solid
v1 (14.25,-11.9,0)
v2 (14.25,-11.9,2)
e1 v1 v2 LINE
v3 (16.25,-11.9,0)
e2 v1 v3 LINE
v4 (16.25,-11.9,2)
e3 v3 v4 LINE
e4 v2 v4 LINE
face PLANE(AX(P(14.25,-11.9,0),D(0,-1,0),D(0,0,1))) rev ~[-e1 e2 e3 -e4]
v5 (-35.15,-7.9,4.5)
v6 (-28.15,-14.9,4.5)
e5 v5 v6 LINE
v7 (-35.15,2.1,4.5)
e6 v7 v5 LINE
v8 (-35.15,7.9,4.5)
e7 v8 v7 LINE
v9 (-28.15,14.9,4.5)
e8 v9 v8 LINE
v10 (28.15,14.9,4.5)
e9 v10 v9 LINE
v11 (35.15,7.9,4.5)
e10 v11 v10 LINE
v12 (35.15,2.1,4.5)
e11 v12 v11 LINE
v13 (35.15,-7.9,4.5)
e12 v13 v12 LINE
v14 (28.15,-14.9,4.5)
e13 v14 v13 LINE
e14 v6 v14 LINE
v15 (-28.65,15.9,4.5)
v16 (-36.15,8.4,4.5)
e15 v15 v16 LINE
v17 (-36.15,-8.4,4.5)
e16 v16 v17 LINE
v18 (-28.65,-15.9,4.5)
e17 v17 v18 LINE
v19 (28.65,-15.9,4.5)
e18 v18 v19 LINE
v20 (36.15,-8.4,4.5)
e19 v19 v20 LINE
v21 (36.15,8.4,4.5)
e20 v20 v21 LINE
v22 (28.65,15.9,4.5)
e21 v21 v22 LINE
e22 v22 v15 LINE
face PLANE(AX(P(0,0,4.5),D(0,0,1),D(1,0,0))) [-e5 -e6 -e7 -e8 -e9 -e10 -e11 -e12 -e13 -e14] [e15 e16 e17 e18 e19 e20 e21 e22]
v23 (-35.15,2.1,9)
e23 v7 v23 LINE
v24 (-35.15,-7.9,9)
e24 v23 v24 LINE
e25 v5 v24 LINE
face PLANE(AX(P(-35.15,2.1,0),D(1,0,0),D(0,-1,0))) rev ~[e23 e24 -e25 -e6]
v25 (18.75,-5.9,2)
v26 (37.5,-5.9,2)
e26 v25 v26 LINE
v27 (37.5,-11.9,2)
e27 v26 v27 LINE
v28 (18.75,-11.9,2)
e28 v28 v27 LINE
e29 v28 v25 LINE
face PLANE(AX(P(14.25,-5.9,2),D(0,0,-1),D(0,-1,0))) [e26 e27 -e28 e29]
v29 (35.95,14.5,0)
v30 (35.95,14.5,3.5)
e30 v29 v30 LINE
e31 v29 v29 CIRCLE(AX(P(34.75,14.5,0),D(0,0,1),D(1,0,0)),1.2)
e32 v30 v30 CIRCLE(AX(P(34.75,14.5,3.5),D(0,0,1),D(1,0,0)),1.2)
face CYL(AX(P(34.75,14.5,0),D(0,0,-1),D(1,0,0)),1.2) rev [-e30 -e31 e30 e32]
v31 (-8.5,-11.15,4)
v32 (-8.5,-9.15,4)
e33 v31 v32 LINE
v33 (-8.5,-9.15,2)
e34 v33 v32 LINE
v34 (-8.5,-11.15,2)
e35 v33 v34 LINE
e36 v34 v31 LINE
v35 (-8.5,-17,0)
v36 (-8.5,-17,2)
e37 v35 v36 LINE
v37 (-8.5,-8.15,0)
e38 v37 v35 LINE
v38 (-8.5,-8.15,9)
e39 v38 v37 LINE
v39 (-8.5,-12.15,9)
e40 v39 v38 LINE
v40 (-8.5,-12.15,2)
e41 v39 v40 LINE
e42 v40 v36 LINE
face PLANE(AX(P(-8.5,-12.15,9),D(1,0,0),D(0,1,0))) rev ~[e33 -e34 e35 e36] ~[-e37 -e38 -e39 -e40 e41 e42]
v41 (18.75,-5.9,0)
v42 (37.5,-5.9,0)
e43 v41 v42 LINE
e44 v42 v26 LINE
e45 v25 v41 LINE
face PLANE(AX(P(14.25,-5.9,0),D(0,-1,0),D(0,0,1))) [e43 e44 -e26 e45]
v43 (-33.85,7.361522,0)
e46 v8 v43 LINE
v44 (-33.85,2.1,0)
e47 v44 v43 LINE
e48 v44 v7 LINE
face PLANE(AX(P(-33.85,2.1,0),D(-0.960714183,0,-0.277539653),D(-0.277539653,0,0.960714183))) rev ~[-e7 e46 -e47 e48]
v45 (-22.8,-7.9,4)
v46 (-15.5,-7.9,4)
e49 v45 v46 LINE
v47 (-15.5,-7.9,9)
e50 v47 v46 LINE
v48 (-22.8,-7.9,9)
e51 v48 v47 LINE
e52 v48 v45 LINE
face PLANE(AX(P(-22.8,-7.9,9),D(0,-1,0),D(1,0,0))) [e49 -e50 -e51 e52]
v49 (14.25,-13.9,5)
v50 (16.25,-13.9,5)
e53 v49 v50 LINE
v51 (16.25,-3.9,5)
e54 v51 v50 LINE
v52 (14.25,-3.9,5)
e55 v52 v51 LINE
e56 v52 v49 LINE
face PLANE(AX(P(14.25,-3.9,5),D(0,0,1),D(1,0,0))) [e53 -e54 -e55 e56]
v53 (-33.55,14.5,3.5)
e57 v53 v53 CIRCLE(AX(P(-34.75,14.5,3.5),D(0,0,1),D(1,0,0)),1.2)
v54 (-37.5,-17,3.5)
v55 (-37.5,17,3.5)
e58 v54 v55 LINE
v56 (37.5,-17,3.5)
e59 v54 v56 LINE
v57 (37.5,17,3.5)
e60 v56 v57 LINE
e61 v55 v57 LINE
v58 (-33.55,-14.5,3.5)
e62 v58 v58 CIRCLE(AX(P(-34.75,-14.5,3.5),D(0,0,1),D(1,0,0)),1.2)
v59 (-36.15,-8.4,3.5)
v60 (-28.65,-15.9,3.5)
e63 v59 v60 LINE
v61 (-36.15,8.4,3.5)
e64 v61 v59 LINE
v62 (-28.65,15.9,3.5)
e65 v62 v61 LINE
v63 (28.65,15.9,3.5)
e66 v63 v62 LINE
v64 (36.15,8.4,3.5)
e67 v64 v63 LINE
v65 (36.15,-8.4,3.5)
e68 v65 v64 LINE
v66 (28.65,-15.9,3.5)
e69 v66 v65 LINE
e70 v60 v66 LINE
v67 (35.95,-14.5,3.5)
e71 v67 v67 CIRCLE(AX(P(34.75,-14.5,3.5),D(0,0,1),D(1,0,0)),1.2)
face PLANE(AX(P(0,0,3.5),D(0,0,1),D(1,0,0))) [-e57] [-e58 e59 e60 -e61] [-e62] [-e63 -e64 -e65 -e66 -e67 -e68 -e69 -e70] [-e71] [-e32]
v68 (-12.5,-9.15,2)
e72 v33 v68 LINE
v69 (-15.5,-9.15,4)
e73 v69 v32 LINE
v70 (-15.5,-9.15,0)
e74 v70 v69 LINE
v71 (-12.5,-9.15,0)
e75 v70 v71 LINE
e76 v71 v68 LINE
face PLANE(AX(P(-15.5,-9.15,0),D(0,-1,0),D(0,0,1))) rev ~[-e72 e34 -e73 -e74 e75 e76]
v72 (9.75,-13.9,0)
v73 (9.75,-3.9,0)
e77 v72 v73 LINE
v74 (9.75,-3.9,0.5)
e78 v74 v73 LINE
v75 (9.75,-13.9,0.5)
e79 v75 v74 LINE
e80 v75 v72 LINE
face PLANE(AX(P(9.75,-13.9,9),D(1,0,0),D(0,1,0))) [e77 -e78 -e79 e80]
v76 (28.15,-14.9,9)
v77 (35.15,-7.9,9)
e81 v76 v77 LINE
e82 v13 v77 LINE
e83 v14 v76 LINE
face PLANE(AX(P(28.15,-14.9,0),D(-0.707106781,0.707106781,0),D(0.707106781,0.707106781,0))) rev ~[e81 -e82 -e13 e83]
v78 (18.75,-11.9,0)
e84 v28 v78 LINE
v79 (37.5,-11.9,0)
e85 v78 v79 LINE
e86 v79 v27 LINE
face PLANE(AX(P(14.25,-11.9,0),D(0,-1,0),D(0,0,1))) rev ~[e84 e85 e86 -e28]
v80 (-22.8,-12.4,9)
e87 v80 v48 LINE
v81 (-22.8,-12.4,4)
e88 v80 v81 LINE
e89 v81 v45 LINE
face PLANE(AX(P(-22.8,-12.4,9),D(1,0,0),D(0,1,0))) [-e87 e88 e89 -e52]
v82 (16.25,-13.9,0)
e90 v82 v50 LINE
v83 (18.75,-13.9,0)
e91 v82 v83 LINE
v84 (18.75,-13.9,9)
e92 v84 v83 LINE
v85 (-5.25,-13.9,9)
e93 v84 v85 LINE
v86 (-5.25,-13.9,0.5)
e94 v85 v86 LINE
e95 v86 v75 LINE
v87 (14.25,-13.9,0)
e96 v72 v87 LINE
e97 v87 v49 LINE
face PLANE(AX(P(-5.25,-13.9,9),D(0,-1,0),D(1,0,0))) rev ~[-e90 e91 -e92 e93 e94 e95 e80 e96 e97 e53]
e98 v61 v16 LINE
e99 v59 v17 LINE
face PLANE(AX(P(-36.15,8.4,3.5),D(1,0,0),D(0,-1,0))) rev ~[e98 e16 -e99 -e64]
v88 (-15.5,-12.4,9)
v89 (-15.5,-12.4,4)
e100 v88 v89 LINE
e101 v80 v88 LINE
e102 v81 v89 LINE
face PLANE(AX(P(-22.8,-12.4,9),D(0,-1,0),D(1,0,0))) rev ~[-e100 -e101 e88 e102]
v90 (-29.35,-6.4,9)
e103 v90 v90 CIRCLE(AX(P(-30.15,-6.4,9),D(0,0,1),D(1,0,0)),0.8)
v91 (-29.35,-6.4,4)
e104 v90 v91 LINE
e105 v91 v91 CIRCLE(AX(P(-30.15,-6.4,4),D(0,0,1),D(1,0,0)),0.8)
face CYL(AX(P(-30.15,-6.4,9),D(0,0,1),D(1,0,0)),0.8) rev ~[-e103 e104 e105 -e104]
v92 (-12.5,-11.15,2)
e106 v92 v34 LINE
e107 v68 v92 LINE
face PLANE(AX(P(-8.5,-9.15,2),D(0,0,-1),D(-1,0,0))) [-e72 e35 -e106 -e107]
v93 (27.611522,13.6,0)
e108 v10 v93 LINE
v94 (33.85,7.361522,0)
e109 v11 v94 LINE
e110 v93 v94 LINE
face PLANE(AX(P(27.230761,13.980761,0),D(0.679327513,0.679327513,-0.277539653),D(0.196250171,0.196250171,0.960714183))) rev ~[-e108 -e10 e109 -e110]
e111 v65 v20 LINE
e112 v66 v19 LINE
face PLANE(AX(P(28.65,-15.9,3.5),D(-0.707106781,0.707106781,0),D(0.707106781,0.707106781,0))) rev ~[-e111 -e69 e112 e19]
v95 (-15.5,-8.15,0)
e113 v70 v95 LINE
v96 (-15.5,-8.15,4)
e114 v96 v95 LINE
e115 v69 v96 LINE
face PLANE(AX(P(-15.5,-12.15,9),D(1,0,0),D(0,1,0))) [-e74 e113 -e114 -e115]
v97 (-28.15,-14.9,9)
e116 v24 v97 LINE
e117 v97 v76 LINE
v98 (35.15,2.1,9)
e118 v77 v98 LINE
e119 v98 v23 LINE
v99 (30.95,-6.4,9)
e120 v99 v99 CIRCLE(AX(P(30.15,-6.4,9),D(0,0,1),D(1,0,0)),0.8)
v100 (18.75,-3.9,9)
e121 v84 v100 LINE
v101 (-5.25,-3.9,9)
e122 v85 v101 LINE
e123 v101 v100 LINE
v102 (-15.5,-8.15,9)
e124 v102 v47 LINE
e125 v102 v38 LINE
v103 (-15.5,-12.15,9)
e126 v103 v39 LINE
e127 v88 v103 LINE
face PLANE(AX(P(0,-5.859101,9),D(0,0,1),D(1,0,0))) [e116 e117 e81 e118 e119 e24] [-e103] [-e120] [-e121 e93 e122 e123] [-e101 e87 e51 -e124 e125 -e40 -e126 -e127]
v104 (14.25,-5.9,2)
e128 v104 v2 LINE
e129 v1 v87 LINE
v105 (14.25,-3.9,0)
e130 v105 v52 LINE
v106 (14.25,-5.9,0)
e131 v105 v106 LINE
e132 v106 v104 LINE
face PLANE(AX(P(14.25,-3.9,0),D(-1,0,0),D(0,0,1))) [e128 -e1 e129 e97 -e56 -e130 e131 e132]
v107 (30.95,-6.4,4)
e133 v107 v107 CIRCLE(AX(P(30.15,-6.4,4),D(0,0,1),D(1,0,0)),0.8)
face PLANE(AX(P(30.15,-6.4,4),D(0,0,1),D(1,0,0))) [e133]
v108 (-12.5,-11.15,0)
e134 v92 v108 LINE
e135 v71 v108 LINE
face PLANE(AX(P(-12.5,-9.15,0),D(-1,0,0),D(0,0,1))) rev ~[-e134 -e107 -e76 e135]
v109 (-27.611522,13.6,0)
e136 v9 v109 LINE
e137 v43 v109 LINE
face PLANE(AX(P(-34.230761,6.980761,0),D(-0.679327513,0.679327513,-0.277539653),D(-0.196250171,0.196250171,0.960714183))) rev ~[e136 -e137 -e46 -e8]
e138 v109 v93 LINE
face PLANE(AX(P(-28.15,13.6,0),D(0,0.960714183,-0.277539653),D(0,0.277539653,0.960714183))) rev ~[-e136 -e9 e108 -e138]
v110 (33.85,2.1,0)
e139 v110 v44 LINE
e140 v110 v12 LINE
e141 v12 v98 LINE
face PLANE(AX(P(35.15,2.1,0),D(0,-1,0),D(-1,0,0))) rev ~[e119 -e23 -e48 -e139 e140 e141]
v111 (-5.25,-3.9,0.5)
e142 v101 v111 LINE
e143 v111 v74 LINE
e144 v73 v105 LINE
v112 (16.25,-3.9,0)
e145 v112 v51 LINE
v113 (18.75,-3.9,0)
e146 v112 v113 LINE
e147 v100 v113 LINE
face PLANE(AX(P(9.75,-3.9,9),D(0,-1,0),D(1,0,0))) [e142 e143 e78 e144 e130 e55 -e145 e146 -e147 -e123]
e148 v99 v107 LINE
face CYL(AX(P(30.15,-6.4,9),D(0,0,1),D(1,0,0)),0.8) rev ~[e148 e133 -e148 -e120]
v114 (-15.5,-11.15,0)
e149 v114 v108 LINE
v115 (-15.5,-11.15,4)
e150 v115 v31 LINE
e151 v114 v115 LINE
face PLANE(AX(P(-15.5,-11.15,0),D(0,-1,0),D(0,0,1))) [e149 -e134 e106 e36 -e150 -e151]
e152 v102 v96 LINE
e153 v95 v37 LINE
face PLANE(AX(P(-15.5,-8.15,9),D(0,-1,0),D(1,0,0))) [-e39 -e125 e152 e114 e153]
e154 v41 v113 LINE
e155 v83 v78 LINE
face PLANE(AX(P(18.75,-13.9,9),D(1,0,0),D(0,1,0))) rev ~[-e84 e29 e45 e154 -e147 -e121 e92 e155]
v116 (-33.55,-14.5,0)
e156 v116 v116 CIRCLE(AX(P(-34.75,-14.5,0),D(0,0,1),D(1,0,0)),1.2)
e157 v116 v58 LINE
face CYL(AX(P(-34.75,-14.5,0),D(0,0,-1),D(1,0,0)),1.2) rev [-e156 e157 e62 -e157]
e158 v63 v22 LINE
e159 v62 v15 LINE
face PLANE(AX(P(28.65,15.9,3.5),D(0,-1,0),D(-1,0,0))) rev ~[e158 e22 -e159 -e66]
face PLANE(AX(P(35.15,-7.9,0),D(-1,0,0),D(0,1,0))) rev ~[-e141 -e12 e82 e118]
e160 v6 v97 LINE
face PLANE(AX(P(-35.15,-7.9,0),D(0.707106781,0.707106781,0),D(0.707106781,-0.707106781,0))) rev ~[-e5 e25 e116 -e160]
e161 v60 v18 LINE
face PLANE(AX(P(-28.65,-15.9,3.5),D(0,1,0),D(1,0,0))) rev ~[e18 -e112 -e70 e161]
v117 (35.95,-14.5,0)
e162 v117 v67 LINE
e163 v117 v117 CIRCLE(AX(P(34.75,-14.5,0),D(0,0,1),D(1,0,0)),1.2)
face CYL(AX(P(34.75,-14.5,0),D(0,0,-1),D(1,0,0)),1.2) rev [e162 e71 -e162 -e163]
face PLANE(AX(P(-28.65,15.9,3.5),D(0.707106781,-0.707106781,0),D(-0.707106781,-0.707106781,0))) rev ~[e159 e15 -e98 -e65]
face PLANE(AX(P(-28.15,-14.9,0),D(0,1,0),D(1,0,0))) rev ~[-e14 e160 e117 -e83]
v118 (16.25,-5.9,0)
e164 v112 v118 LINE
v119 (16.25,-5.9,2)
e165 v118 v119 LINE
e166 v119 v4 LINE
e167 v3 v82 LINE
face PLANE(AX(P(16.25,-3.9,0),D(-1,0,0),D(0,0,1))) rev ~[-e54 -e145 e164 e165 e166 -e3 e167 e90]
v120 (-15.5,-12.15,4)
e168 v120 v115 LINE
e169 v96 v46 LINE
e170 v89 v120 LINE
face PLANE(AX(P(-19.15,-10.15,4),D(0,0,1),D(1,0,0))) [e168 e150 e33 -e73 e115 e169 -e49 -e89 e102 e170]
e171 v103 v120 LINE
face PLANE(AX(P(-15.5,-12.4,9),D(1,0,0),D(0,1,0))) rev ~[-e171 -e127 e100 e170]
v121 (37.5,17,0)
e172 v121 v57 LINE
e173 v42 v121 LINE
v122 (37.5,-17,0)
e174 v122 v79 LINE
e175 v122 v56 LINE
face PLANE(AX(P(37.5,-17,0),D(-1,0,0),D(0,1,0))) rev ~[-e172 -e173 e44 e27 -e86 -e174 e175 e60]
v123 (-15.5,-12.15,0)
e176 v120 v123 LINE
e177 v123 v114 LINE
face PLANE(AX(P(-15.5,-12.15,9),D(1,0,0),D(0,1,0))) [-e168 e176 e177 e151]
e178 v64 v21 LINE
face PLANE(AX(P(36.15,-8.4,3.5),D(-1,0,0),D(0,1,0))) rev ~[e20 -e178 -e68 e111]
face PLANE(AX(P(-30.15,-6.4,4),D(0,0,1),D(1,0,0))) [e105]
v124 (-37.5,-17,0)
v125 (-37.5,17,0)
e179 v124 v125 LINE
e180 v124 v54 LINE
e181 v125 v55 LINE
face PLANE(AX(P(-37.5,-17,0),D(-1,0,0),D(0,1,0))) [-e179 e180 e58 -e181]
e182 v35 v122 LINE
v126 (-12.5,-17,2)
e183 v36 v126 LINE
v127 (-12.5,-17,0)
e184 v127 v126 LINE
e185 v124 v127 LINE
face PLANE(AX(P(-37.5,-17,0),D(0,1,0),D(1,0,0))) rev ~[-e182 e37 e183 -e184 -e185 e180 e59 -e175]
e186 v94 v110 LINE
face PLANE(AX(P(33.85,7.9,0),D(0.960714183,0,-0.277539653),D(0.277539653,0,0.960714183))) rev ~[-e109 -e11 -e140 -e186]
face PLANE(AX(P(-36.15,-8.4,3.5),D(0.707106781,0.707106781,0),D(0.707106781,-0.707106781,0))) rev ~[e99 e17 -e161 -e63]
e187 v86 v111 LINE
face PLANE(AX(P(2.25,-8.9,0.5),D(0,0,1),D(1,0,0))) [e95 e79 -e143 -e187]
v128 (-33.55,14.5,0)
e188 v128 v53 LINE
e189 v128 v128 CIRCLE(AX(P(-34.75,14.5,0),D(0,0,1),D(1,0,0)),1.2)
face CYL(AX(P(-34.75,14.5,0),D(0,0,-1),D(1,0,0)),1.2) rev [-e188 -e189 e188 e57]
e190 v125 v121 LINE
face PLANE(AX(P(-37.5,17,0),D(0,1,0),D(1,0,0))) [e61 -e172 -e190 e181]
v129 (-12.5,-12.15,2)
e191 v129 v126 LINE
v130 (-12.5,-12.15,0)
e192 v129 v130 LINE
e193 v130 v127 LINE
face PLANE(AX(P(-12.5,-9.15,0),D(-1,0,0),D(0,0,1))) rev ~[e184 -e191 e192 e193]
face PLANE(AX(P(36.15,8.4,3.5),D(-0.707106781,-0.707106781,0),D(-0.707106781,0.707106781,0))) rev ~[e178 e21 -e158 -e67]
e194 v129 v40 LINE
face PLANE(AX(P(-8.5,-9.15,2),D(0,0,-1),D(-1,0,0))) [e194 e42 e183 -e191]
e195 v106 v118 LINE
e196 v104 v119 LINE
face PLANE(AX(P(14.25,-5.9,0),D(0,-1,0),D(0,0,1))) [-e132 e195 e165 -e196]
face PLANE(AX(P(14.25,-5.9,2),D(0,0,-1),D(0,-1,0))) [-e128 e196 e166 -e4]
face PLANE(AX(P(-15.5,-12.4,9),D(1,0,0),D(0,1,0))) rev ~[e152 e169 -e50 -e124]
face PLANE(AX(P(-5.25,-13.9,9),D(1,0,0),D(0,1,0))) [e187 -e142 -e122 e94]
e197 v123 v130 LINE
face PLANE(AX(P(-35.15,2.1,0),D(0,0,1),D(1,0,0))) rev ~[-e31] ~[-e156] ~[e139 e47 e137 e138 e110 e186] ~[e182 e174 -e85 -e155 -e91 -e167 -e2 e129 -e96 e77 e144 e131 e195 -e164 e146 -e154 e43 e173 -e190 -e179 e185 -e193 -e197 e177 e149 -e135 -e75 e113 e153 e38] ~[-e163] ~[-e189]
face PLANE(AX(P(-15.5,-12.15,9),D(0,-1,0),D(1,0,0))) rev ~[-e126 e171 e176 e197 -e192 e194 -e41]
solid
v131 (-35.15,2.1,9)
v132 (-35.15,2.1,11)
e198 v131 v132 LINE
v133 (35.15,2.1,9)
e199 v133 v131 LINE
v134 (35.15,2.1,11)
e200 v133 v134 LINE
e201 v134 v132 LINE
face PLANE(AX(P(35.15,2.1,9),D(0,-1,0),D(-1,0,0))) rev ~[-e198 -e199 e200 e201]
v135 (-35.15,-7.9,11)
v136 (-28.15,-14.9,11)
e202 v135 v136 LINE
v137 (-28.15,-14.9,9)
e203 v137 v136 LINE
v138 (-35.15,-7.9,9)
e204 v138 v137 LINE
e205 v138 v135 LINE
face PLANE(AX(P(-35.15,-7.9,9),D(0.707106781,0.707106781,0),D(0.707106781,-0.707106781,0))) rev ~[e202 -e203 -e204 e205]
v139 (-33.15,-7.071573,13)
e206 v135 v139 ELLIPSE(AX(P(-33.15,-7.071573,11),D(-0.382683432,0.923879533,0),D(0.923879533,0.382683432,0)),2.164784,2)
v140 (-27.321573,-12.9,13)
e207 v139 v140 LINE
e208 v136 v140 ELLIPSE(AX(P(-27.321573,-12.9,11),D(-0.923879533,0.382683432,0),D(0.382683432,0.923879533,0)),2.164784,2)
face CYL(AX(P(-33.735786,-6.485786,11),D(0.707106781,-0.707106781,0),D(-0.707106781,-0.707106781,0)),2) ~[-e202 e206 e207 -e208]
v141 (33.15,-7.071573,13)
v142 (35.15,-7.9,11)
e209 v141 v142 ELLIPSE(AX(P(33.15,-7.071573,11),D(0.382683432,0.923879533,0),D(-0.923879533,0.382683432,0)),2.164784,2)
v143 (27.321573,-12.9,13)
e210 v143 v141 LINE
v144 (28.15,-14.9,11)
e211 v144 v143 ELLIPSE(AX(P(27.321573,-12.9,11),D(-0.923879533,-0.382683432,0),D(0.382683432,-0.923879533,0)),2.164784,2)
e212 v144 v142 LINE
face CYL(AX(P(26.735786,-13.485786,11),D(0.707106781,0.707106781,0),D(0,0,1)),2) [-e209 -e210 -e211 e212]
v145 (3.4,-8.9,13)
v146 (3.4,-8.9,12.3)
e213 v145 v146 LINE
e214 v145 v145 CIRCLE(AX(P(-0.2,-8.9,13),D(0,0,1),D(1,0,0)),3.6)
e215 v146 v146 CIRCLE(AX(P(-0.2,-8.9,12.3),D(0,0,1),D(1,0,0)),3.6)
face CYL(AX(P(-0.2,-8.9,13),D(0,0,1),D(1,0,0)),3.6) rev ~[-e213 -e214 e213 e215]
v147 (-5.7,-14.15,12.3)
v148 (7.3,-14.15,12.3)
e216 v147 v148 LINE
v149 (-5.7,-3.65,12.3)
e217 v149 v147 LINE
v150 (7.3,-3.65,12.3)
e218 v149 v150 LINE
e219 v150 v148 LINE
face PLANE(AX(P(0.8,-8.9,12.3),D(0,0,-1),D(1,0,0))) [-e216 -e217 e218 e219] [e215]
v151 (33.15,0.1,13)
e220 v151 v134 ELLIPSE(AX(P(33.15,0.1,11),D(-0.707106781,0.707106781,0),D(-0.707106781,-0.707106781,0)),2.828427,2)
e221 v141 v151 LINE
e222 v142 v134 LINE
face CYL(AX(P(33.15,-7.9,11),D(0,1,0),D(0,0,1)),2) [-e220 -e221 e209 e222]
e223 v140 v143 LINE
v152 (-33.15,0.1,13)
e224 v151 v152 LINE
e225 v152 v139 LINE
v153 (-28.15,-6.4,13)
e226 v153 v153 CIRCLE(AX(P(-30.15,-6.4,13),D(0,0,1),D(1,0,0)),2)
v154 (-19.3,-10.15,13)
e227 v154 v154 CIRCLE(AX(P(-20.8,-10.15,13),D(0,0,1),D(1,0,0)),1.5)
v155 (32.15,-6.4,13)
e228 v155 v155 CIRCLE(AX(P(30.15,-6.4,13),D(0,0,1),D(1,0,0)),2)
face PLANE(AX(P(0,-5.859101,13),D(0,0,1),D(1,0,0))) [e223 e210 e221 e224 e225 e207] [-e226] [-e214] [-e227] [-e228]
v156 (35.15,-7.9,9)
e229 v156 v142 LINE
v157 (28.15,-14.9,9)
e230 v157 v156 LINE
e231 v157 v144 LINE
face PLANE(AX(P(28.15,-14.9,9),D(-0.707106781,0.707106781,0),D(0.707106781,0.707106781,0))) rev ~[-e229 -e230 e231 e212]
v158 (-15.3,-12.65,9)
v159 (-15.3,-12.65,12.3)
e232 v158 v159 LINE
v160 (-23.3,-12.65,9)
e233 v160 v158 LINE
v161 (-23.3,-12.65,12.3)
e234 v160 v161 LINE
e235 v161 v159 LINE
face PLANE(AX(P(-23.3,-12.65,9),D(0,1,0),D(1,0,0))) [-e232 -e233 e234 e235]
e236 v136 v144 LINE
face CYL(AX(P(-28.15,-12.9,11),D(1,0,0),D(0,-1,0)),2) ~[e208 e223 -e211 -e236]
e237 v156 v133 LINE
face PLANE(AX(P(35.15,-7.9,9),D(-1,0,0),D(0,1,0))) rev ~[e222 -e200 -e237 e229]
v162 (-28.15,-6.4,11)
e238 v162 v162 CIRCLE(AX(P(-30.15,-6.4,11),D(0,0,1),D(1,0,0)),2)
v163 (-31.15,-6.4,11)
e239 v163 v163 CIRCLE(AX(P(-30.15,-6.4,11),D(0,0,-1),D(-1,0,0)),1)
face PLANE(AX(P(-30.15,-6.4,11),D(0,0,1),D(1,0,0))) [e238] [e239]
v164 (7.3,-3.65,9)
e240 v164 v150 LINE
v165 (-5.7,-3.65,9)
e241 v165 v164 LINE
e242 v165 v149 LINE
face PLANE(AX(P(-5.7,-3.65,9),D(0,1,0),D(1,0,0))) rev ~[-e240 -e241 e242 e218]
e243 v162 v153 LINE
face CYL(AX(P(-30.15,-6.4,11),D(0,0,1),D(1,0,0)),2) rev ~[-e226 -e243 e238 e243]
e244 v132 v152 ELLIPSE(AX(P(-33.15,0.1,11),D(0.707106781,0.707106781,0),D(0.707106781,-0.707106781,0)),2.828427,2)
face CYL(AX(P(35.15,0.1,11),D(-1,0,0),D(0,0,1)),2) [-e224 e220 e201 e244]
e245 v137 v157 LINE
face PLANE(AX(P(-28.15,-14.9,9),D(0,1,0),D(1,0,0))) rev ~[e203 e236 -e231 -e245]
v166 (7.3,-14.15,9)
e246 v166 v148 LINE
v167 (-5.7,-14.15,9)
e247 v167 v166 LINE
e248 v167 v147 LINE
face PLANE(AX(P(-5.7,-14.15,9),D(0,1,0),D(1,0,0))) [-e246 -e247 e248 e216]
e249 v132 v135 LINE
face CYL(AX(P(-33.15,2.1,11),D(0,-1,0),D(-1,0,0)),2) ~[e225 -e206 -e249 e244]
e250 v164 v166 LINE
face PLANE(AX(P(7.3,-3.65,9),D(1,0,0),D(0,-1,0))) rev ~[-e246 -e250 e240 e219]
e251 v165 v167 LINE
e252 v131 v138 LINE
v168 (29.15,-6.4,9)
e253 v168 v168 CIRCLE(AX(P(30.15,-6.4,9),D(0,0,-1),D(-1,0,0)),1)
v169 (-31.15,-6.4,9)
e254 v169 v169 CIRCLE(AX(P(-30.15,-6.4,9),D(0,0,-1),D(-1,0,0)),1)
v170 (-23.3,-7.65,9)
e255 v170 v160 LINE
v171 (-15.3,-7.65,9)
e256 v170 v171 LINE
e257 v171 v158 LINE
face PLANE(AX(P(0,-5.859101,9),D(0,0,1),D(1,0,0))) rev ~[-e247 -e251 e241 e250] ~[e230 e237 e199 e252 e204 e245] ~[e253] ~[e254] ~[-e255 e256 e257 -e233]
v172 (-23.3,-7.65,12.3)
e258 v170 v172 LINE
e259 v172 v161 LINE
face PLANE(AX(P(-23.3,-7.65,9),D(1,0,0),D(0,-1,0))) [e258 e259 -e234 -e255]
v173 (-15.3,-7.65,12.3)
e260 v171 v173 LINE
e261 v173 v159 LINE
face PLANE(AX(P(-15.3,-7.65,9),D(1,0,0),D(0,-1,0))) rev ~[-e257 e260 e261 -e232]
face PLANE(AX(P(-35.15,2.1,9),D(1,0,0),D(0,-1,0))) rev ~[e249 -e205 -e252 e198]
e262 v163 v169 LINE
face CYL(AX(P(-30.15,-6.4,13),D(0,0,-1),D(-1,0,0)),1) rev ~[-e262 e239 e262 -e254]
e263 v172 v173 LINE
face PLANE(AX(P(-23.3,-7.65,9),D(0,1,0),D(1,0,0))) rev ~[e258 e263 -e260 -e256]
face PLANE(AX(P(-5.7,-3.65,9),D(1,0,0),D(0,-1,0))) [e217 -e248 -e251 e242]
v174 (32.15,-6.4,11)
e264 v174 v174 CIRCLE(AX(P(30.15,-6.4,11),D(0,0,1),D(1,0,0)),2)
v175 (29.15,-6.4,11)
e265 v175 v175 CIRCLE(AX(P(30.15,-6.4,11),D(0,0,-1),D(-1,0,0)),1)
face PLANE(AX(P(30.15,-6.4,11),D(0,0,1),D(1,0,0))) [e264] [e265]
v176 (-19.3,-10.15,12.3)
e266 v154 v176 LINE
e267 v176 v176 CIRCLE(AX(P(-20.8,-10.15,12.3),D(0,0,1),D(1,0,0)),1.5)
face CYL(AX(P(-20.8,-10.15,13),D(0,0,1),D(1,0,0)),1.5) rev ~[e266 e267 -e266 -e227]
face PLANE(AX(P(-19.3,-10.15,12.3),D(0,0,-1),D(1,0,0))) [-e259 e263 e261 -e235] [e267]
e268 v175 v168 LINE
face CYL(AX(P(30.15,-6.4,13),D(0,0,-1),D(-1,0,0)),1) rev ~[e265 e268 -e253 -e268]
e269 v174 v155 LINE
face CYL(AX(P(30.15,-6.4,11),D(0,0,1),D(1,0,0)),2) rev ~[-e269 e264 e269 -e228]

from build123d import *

# Parameters (mm, degrees)
F0_W            = 75
F0_H            = 34
F0_R            = 1.2
F1_DEPTH        = 3.5
F3_DEPTH        = 1
F5_DEPTH        = 5
F11_DEPTH       = 9
F12_W           = 15
F12_H           = 10
F13_DEPTH       = 8.5
F14_W           = 7.3
F14_H           = 4.5
F15_DEPTH       = 5
F16_W           = 9
F16_H           = 10
F16_W_2         = 7
F16_H_2         = 4
F17_DEPTH       = 25
F18_W           = 2
F18_H           = 5
F19_DEPTH       = 10
F20_W           = 6
F20_H           = 2
F21_DEPTH       = 25
F22_R           = 0.8
F23_DEPTH       = 5
F26_DEPTH       = 4
F27_R           = 3.6
F27_R_2         = 1.5
F28_DEPTH       = 25
F29_W           = 13
F29_H           = 10.5
F29_W_2         = 8
F29_H_2         = 5
F30_DEPTH       = 3.3
F31_W           = 2
F31_H           = 4
F32_DEPTH       = 7
F33_W           = 4
F33_H           = 2
F34_DEPTH       = 25
F36_D           = 2
F36_DEPTH       = 10
F36_CBORE_D     = 4
F36_CBORE_DEPTH = 2
F36_TIP         = 0.600860619
F37_R           = 2


with BuildPart() as f1:
    # F0 (on Top) → F1 (new body)
    with BuildSketch(Plane.XY):
        Rectangle(F0_W, F0_H)
        with Locations((-34.75, -14.5)):
            Circle(F0_R, mode=Mode.SUBTRACT)
        with Locations((34.75, -14.5)):
            Circle(F0_R, mode=Mode.SUBTRACT)
        with Locations((-34.75, 14.5)):
            Circle(F0_R, mode=Mode.SUBTRACT)
        with Locations((34.75, 14.5)):
            Circle(F0_R, mode=Mode.SUBTRACT)
    extrude(amount=F1_DEPTH)

    # F2 (on face) → F3 (join)
    with BuildSketch(Plane.XY.offset(3.5)):
        Polygon((28.65, 15.9), (-28.65, 15.9), (-36.15, 8.4), (-36.15, -8.4), (-28.65, -15.9), (28.65, -15.9), (36.15, -8.4), (36.15, 8.4), align=None)
    extrude(amount=F3_DEPTH)

    # F4 (on face) → F5 (cut)
    with BuildSketch(Plane.XY.offset(4.5)):
        Polygon((28.15, 14.9), (-28.15, 14.9), (-35.15, 7.9), (-35.15, -7.9), (-28.15, -14.9), (28.15, -14.9), (35.15, -7.9), (35.15, 7.9), align=None)
    extrude(amount=-F5_DEPTH, mode=Mode.SUBTRACT)

    # F9: sweep along a path in F8
    with BuildLine(Plane.XY.offset(4.5)) as f9_path:
        Line((-35.15, 2.1), (-35.15, 7.9))
        Line((-35.15, 7.9), (-28.15, 14.9))
        Line((-28.15, 14.9), (28.15, 14.9))
        Line((28.15, 14.9), (35.15, 7.9))
        Line((35.15, 7.9), (35.15, 2.1))
    # F7 (on offset) → F9 (sweep)
    with BuildSketch(Plane.XZ.offset(-2.1)):
        Polygon((-33.85, 0), (-35.15, 4.5), (-35.15, 0), align=None)
    sweep(path=f9_path.line, transition=Transition.RIGHT)

    # F10 (on Top) → F11 (join)
    with BuildSketch(Plane.XY):
        Polygon((-35.15, -7.9), (-28.15, -14.9), (28.15, -14.9), (35.15, -7.9), (35.15, 2.1), (-35.15, 2.1), align=None)
    extrude(amount=F11_DEPTH)

    # F12 (on face) → F13 (cut)
    with BuildSketch(Plane.XY.offset(9)):
        with Locations((2.25, -8.9)):
            Rectangle(F12_W, F12_H)
    extrude(amount=-F13_DEPTH, mode=Mode.SUBTRACT)

    # F14 (on face) → F15 (cut)
    with BuildSketch(Plane.XY.offset(9)):
        with Locations((-19.15, -10.15)):
            Rectangle(F14_W, F14_H)
    extrude(amount=-F15_DEPTH, mode=Mode.SUBTRACT)

    # F16 (on face) → F17 (cut)
    with BuildSketch(Plane.XY.offset(9)):
        with Locations((14.25, -8.9)):
            Rectangle(F16_W, F16_H)
        with Locations((-12, -10.15)):
            Rectangle(F16_W_2, F16_H_2)
    extrude(amount=-F17_DEPTH, mode=Mode.SUBTRACT)

    # F18 (on face) → F19 (join)
    with BuildSketch(Plane.XZ.offset(3.9)):
        with Locations((15.25, 2.5)):
            Rectangle(F18_W, F18_H)
    extrude(amount=F19_DEPTH)

    # F20 (on face) → F21 (cut)
    with BuildSketch(Plane(origin=(14.25, 0, 0), x_dir=(0, -1, 0), z_dir=(-1, 0, 0))):
        with Locations((8.9, 1)):
            Rectangle(F20_W, F20_H)
    extrude(amount=-F21_DEPTH, mode=Mode.SUBTRACT)

    # F22 (on face) → F23 (cut)
    with BuildSketch(Plane.XY.offset(9)):
        with Locations((-30.15, -6.4)):
            Circle(F22_R)
        with Locations((30.15, -6.4)):
            Circle(F22_R)
    extrude(amount=-F23_DEPTH, mode=Mode.SUBTRACT)

    # F31 (on face) → F32 (join)
    with BuildSketch(Plane.YZ.offset(-15.5)):
        with Locations((-10.15, 2)):
            Rectangle(F31_W, F31_H)
    extrude(amount=F32_DEPTH)

    # F33 (on face) → F34 (cut)
    with BuildSketch(Plane(origin=(0, -9.15, 0), x_dir=(-1, 0, 0), z_dir=(0, 1, 0))):
        with Locations((10.5, 1)):
            Rectangle(F33_W, F33_H)
    extrude(amount=-F34_DEPTH, mode=Mode.SUBTRACT)


with BuildPart() as f26:
    # F25 (on offset) → F26 (new body)
    with BuildSketch(Plane.XY.offset(9)):
        Polygon((-35.15, -7.9), (-28.15, -14.9), (28.15, -14.9), (35.15, -7.9), (35.15, 2.1), (-35.15, 2.1), align=None)
    extrude(amount=F26_DEPTH)

    # F27 (on face) → F28 (cut)
    with BuildSketch(Plane.XY.offset(13)):
        with Locations((-0.2, -8.9)):
            Circle(F27_R)
        with Locations((-20.8, -10.15)):
            Circle(F27_R_2)
    extrude(amount=-F28_DEPTH, mode=Mode.SUBTRACT)

    # F29 (on face) → F30 (cut)
    with BuildSketch(Plane(origin=(0, 0, 9), x_dir=(1, 0, 0), z_dir=(0, 0, -1))):
        with Locations((0.8, 8.9)):
            Rectangle(F29_W, F29_H)
        with Locations((-19.3, 10.15)):
            Rectangle(F29_W_2, F29_H_2)
    extrude(amount=-F30_DEPTH, mode=Mode.SUBTRACT)

    # F36
    with Locations(Plane.XY.offset(13)):
        with Locations((-30.15, -6.4), (30.15, -6.4)):
            CounterBoreHole(F36_D / 2, F36_CBORE_D / 2, F36_CBORE_DEPTH, depth=F36_DEPTH)
            with Locations((0, 0, -(F36_DEPTH + F36_TIP / 2))):  # 118° drill point
                Cone(0, F36_D / 2, F36_TIP, mode=Mode.SUBTRACT)

    # F37
    f37_edges = [f26.edges().sort_by_distance(p)[0] for p in [
        (0, -14.9, 13),
        (-31.65, -11.4, 13),
        (-35.15, -2.9, 13),
        (0, 2.1, 13),
        (35.15, -2.9, 13),
        (31.65, -11.4, 13),
    ]]
    fillet(f37_edges, radius=F37_R)


solid = Compound([f1.part, f26.part])
